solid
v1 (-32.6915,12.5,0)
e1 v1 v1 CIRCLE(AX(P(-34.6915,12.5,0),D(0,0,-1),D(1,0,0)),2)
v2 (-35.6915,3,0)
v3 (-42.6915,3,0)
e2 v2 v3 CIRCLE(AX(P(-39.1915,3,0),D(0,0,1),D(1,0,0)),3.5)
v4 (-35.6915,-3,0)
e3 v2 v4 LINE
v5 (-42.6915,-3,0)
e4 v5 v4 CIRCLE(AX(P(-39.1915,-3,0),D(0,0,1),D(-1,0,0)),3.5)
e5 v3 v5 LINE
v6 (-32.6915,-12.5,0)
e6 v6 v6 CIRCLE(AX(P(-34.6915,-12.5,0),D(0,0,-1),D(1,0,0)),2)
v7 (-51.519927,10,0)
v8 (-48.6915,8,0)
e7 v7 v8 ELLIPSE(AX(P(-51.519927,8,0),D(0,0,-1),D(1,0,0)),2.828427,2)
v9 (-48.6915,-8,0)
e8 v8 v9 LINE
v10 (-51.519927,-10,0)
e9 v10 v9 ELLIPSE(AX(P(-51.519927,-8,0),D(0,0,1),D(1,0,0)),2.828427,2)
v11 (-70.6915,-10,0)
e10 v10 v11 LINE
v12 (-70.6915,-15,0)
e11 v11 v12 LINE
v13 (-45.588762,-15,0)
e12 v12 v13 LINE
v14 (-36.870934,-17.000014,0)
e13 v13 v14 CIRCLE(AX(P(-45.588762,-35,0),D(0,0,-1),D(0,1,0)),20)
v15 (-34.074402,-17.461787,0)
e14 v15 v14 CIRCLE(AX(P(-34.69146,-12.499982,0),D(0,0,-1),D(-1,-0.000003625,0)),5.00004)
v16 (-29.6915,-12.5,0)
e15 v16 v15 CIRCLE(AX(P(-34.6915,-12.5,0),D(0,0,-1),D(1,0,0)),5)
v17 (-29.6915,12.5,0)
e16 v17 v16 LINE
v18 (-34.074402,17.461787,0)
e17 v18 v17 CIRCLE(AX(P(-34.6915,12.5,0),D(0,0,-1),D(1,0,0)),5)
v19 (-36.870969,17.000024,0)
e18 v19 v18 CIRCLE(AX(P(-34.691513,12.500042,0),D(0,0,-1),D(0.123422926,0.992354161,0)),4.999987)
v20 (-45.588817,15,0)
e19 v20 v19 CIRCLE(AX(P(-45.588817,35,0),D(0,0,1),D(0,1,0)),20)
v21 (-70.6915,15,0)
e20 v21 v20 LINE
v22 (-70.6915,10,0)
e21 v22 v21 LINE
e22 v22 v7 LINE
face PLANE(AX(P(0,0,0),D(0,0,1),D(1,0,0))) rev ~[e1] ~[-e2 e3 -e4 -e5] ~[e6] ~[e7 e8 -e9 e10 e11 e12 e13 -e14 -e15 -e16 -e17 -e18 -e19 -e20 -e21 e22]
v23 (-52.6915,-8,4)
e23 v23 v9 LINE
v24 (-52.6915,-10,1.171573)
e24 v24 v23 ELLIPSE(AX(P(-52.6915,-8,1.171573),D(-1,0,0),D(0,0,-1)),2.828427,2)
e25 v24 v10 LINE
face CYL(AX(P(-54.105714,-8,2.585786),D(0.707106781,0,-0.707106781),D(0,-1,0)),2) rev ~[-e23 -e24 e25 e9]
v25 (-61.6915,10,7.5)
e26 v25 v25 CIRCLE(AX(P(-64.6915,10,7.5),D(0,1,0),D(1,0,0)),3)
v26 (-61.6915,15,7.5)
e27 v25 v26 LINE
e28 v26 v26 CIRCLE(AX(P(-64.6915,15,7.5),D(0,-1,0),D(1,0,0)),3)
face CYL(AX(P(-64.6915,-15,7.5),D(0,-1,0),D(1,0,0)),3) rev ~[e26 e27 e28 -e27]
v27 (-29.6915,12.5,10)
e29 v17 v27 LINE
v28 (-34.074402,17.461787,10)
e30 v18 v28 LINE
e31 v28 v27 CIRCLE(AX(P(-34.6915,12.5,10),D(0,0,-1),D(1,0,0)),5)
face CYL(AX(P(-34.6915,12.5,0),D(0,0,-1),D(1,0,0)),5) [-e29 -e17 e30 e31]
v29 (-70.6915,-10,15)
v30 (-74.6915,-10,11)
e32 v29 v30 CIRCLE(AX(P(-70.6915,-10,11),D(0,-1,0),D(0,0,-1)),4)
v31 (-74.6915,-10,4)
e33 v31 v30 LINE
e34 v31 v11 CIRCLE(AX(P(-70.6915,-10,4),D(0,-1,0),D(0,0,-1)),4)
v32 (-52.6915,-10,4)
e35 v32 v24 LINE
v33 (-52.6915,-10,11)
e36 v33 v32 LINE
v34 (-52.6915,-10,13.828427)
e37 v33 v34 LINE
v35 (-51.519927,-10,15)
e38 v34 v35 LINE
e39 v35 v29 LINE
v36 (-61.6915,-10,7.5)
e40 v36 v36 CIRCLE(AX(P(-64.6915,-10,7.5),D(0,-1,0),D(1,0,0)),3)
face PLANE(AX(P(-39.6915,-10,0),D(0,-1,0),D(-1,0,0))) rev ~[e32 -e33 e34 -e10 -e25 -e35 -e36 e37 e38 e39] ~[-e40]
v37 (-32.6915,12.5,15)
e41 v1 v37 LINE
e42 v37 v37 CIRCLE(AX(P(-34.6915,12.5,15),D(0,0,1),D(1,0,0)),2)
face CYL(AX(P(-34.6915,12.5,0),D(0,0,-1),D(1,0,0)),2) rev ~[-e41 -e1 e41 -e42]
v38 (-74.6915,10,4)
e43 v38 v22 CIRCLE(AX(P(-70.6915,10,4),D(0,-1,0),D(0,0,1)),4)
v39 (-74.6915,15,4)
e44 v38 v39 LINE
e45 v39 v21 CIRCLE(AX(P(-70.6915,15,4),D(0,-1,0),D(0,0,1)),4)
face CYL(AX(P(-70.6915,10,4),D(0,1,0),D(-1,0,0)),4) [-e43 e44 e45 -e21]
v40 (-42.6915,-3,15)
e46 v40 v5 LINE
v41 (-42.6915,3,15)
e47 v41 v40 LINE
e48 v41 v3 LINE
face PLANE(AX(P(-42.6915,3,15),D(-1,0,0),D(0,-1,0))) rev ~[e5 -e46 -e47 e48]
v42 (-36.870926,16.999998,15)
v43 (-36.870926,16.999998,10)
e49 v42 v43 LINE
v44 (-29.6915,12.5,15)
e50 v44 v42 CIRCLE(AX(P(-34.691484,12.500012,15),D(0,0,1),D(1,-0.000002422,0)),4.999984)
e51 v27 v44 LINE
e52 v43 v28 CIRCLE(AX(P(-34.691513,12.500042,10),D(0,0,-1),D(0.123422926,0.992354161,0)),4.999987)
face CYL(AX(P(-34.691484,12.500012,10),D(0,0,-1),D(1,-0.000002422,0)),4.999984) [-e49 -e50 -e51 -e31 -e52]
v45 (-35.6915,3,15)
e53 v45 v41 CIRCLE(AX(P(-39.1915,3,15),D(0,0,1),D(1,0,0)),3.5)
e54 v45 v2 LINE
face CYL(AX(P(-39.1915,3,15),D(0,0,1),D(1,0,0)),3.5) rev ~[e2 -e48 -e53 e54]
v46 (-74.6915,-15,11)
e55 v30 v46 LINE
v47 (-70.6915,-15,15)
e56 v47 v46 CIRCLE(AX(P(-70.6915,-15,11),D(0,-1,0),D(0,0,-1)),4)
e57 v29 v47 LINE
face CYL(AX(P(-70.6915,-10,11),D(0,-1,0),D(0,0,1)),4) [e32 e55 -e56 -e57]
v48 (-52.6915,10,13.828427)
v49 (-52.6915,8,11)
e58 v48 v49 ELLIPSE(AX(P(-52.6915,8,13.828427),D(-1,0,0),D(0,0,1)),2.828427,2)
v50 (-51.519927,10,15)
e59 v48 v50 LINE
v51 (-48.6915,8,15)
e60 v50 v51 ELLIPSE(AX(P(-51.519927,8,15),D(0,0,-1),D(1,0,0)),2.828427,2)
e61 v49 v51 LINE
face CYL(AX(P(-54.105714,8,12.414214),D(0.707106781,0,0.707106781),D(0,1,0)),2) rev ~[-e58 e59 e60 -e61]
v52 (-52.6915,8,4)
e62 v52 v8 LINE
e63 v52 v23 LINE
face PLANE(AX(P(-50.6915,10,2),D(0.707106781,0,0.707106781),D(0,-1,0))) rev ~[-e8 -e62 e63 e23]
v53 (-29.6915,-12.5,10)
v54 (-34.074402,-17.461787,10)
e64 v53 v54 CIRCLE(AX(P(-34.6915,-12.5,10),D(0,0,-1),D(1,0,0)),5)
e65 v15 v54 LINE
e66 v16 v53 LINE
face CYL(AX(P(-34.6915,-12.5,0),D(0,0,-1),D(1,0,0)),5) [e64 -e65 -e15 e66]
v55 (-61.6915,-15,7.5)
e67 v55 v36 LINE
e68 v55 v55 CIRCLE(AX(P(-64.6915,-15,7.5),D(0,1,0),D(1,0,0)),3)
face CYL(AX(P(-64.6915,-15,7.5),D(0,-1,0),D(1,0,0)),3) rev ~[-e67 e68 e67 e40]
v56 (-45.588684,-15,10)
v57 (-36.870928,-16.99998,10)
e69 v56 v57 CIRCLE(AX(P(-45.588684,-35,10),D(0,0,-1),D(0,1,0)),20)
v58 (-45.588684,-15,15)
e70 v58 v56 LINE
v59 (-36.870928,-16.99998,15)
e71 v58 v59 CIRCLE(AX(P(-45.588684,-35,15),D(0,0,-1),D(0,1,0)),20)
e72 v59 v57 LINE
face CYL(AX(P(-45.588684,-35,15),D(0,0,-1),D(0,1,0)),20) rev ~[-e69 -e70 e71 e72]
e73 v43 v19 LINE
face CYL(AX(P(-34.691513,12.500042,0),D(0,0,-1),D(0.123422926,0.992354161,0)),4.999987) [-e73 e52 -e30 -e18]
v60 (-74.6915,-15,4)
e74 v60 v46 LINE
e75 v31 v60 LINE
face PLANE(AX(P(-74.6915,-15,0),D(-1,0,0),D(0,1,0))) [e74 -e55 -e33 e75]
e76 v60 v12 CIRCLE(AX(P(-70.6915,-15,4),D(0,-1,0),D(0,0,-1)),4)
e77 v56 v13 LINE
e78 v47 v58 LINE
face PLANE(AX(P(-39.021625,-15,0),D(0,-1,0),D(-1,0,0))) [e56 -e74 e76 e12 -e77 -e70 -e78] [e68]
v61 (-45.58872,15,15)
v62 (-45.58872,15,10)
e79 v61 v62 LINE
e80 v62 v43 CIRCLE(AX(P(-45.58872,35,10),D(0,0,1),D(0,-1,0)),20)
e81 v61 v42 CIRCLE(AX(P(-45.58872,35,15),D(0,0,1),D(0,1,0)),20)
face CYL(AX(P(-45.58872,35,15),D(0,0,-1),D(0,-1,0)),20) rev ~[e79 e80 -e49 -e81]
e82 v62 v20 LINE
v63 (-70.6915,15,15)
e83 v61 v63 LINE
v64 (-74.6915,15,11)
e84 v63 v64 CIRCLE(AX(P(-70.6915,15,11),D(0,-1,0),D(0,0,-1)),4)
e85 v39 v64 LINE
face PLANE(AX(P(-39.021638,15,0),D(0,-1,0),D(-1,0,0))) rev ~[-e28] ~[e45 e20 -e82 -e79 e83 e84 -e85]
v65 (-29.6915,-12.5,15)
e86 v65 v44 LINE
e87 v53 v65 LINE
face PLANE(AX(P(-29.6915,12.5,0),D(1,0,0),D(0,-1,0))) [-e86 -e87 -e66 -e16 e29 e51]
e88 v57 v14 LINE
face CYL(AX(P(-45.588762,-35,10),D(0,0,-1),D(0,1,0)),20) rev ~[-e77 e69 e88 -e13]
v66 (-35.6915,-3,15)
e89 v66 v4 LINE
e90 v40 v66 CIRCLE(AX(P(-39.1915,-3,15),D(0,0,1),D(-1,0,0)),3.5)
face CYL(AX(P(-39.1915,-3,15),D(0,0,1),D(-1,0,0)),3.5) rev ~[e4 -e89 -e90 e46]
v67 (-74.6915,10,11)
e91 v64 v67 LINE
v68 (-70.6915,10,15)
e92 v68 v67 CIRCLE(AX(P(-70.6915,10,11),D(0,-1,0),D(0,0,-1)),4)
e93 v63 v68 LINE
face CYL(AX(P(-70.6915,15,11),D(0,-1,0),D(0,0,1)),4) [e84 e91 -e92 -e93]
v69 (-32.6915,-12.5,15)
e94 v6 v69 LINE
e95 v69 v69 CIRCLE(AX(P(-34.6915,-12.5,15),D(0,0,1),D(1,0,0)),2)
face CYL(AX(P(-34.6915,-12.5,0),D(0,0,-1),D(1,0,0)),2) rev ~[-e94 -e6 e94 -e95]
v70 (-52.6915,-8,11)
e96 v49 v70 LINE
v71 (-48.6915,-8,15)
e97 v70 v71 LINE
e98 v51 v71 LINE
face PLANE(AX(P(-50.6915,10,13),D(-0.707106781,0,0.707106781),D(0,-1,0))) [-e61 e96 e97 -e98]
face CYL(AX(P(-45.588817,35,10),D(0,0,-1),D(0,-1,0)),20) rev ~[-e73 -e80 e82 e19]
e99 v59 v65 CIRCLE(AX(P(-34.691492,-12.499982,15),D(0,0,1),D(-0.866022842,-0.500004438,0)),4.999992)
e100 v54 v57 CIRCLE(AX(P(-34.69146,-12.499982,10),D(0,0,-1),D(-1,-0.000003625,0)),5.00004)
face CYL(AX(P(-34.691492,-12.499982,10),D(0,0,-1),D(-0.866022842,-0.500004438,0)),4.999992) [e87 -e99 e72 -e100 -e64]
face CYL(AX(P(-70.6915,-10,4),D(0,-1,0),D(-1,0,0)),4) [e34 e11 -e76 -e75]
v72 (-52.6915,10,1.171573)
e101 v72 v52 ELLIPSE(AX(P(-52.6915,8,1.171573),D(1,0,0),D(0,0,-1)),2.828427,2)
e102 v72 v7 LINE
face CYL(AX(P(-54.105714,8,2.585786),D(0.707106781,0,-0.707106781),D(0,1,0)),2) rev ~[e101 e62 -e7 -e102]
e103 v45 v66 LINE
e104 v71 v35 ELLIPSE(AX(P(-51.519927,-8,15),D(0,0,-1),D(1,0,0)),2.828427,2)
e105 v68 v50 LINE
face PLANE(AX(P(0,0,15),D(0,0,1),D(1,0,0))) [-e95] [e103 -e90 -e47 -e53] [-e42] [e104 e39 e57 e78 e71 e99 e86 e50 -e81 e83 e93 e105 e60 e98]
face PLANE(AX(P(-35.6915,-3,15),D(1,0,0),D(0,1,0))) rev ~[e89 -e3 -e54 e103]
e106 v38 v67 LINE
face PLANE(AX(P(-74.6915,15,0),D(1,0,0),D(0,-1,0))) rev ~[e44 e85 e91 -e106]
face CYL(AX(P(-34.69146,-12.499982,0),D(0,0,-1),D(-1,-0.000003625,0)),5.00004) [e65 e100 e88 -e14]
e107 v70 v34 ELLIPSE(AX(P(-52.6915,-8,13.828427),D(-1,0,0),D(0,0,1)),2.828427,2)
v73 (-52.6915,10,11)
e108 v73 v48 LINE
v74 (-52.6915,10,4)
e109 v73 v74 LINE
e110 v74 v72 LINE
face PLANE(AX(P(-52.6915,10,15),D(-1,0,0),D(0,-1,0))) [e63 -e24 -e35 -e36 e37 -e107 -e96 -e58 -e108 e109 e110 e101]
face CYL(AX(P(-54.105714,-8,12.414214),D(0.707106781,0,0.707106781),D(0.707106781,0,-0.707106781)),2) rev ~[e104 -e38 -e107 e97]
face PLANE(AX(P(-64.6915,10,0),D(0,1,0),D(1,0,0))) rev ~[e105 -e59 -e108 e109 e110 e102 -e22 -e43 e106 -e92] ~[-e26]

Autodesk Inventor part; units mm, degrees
ref_plane "YZ Plane" through (0, 0, 0) normal (1, 0, 0) x (0, 1, 0)
ref_plane "XZ Plane" through (0, 0, 0) normal (0, 1, 0) x (-1, 0, 0)
ref_plane "XY Plane" through (0, 0, 0) normal (0, 0, 1) x (1, 0, 0)
sketch "Sketch1" plane through (0, 0, 0) normal (0, 0, 1) x (1, 0, 0)
  circle A0 centre (19.8085, -5.5) radius 1 projected
  circle A1 centre (30.8085, -5.5) radius 1 projected
  circle A2 centre (19.8085, 5.5) radius 1 projected
  circle A3 centre (30.8085, 5.5) radius 1 projected
  circle A4 centre (25.3085, 0) radius 6.65 projected
  line L0 (41.3085, 2) -> (41.3085, -2) projected
  line L1 (35.1065, 2) -> (41.3085, 2) projected
  arc A5 (35.1065, 2) -> (26.5426, 9.9236) centre (25.3085, 0) ccw projected
  line L2 (26.5426, 9.9236) -> (-34.0744, 17.4618) projected
  arc A6 (-34.0744, 17.4618) -> (-39.6915, 12.5) centre (-34.6915, 12.5) ccw projected
  line L3 (-39.6915, 12.5) -> (-39.6915, -12.5) projected
  arc A7 (-39.6915, -12.5) -> (-34.0744, -17.4618) centre (-34.6915, -12.5) ccw projected
  line L4 (-34.0744, -17.4618) -> (26.5426, -9.9236) projected
  arc A8 (26.5426, -9.9236) -> (35.1065, -2) centre (25.3085, 0) ccw projected
  line L5 (41.3085, -2) -> (35.1065, -2) projected
  circle A9 centre (-34.6915, 12.5) radius 2 projected
  circle A10 centre (-34.6915, -12.5) radius 2 projected
  line L6 (-25.1979, 6.2809) -> (9.3489, 1.9847) projected
  arc A11 (9.3489, -1.9847) -> (9.3489, 1.9847) centre (9.1021, 0) ccw projected
  line L7 (9.3489, -1.9847) -> (-25.1979, -6.2809) projected
  arc A12 (-29.6915, -2.3115) -> (-25.1979, -6.2809) centre (-25.6915, -2.3115) ccw projected
  line L8 (-29.6915, -2.3115) -> (-29.6915, 2.3115) projected
  arc A13 (-25.1979, 6.2809) -> (-29.6915, 2.3115) centre (-25.6915, 2.3115) ccw projected
  circle A14 centre (-34.6915, -12.5) radius 5
  circle A15 centre (-34.6915, 12.5) radius 5
  line L9 (-34.6915, -12.5) -> (-34.6915, 12.5)
  line L10 (-34.6915, -12.5) -> (-29.6915, -12.5)
  line L11 (-34.6915, 12.5) -> (-29.6915, 12.5)
  line L12 (-29.6915, 12.5) -> (-29.6915, -12.5)
  line L13 (-34.6915, 0) -> (-64.6915, 0)
  line L14 (-64.6915, -10) -> (-64.6915, 10)
  line L15 (-64.6915, 10) -> (-34.6915, 10)
  line L16 (-34.6915, 10) -> (-34.6915, -10)
  line L17 (-34.6915, -10) -> (-64.6915, -10)
  line L18 (-64.6915, -10) -> (-34.6915, 10) construction
  line L19 (-64.6915, 10) -> (-34.6915, -10) construction
  line L20 (-64.6915, -10) -> (-34.6915, -10)
  line L21 (-34.6915, -10) -> (-34.6915, -15)
  line L22 (-34.6915, -15) -> (-64.6915, -15)
  line L23 (-64.6915, -15) -> (-64.6915, -10)
  line L24 (-64.6915, 10) -> (-34.6915, 10)
  line L25 (-34.6915, 10) -> (-34.6915, 15)
  line L26 (-34.6915, 15) -> (-64.6915, 15)
  line L27 (-64.6915, 15) -> (-64.6915, 10)
  point P0 (0, 0)
  point P1 (-49.6915, 0)
  point P2 (-39.0216, 15)
  point P3 (-39.6915, 10)
  point P4 (-39.6915, -10)
  point P5 (-39.0216, -15)
  dimension "d0" = 10
  dimension "d1" = 10
  dimension "d2" = 30
  dimension "d3" = 20
  dimension "d4" = 30
  dimension "d5" = 30
  dimension "d6" = 5
  dimension "d7" = 30
  dimension "d8" = 5
extrude "Extrusion1" add sketch "Sketch1" along normal blind 10 contours A15 L11 A9 L25 L26 A6 | A7 L22 L21 A10 L10 A14 | L26 L25 A9 L9 L15 A15 A6 | A6 L3 L15 L27 L26 | L12 L8 A14 L9 A15 | A15 L9 A9 L11 | L22 L23 L17 L3 A7 | A7 A14 L17 L9 A10 L21 L22 | L10 A10 L9 A14 | A15 L15 L3 | L9 L13 L3 L15 A15 | A15 L15 L9 | L3 L17 A14 | L9 L17 A14 | A14 L17 L3 L13 L9
thicken "Thicken1" operation add thickness 10 both sides no extend neighbours yes toward (-1, 0, 0) faces at (-64.6915, -11.6667, 3.3333)
thicken "Thicken2" operation add thickness 10 both sides no extend neighbours yes toward (-1, 0, 0) faces at (-64.6915, 13.3333, 3.3333)
sketch "Sketch2" plane through (0, 0, 10) normal (0, 0, 1) x (1, 0, 0)
  line L0 (-39.6915, 10) -> (-39.6915, -10) projected
  line L1 (-39.6915, -10) -> (-74.6915, -10) projected
  line L2 (-74.6915, -10) -> (-74.6915, -15) projected
  line L3 (-74.6915, -15) -> (-39.0216, -15) projected
  arc A0 (-39.0216, -15) -> (-29.6915, -12.5) centre (-34.6915, -12.5) ccw projected
  line L4 (-29.6915, -12.5) -> (-29.6915, 12.5) projected
  arc A1 (-29.6915, 12.5) -> (-39.0216, 15) centre (-34.6915, 12.5) ccw projected
  line L5 (-39.0216, 15) -> (-74.6915, 15) projected
  line L6 (-74.6915, 15) -> (-74.6915, 10) projected
  line L7 (-74.6915, 10) -> (-39.6915, 10) projected
  circle A2 centre (-34.6915, -12.5) radius 2 projected
  circle A3 centre (-34.6915, 12.5) radius 2 projected
  point P0 (0, 0)
extrude "Extrusion2" add sketch "Sketch2" along normal blind 5
sketch "Sketch3" plane through (0, 0, 15) normal (0, 0, 1) x (1, 0, 0)
  line L0 (-39.6915, 10) -> (-39.6915, -10) projected
  line L1 (-39.6915, -10) -> (-74.6915, -10) projected
  line L2 (-74.6915, -10) -> (-74.6915, -15) projected
  line L3 (-74.6915, -15) -> (-39.0216, -15) projected
  arc A0 (-39.0216, -15) -> (-29.6915, -12.5) centre (-34.6915, -12.5) ccw projected
  line L4 (-29.6915, -12.5) -> (-29.6915, 12.5) projected
  arc A1 (-29.6915, 12.5) -> (-39.0216, 15) centre (-34.6915, 12.5) ccw projected
  line L5 (-39.0216, 15) -> (-74.6915, 15) projected
  line L6 (-74.6915, 15) -> (-74.6915, 10) projected
  line L7 (-74.6915, 10) -> (-39.6915, 10) projected
  circle A2 centre (-34.6915, -12.5) radius 2 projected
  circle A3 centre (-34.6915, 12.5) radius 2 projected
  line L8 (-39.6915, 10) -> (-39.6915, -10) projected
  line L9 (-39.6915, 10) -> (-52.6915, 10)
  line L10 (-52.6915, 10) -> (-52.6915, -10)
  line L11 (-52.6915, -10) -> (-39.6915, -10)
  line L12 (-39.6915, -10) -> (-39.6915, 10)
  point P0 (0, 0)
  dimension "d17" = 13
  dimension "d18" = 20
extrude "Extrusion3" add sketch "Sketch3" against normal up to surface (15 mm away) contours L0 L1 L10 L7
chamfer "Chamfer1" distance 4 angle 45 2 edges at (-52.6915, 0, 0) (-52.6915, 0, 15)
fillet "Fillet1" radius 20 2 edges at (-39.0216, -15, 7.5) (-39.0216, 15, 7.5)
sketch "Sketch4" plane through (0, 0, 15) normal (0, 0, 1) x (1, 0, 0)
  line L0 (-48.6915, -10) -> (-74.6915, -10) projected
  line L1 (-74.6915, -10) -> (-74.6915, -15) projected
  line L2 (-74.6915, -15) -> (-45.5887, -15) projected
  arc A0 (-36.8709, -17) -> (-45.5887, -15) centre (-45.5887, -35) ccw projected
  arc A1 (-36.8709, -17) -> (-29.6915, -12.5) centre (-34.6915, -12.5) ccw projected
  line L3 (-29.6915, -12.5) -> (-29.6915, 12.5) projected
  arc A2 (-29.6915, 12.5) -> (-36.8709, 17) centre (-34.6915, 12.5) ccw projected
  arc A3 (-45.5887, 15) -> (-36.8709, 17) centre (-45.5887, 35) ccw projected
  line L4 (-45.5887, 15) -> (-74.6915, 15) projected
  line L5 (-74.6915, 15) -> (-74.6915, 10) projected
  line L6 (-74.6915, 10) -> (-48.6915, 10) projected
  line L7 (-48.6915, -10) -> (-48.6915, 10) projected
  circle A4 centre (-34.6915, -12.5) radius 2 projected
  circle A5 centre (-34.6915, 12.5) radius 2 projected
  circle A6 centre (-34.6915, -12.5) radius 2 projected
  line L8 (-34.6915, 12.5) -> (-34.6915, -12.5)
  line L9 (-34.6915, 0) -> (-39.1915, 0)
  line L10 (-39.1915, 3) -> (-39.1915, -3) construction
  line L11 (-42.6915, 3) -> (-42.6915, -3)
  line L12 (-35.6915, -3) -> (-35.6915, 3)
  arc A7 (-35.6915, 3) -> (-42.6915, 3) centre (-39.1915, 3) ccw
  arc A8 (-42.6915, -3) -> (-35.6915, -3) centre (-39.1915, -3) ccw
  point P0 (0, 0)
  dimension "d25" = 4.5
  dimension "d26" = 3
  dimension "d27" = 7
extrude "Extrusion4" cut sketch "Sketch4" against normal blind 20 contours A7 L12 A8 L11
sketch "Sketch5" plane through (-74.6915, -15, 0) normal (0, -1, 0) x (1, 0, 0)
  line L0 (29.1028, 15) -> (29.1028, 0) projected
  line L1 (0, 15) -> (29.1028, 15) projected
  line L2 (0, 0) -> (0, 15) projected
  line L3 (0, 0) -> (29.1028, 0) projected
  line L4 (0, 0) -> (0, 15) projected
  line L5 (0, 7.5) -> (10, 7.5)
  circle A0 centre (10, 7.5) radius 3
  point P0 (74.6915, 0)
  dimension "d30" = 10
  dimension "d31" = 6
extrude "Extrusion5" cut sketch "Sketch5" against normal blind 30 contours A0
fillet "Fillet2" radius 2 4 edges at (-50.6915, 10, 13) (-50.6915, -10, 13) (-50.6915, -10, 2) (-50.6915, 10, 2)
fillet "Fillet3" radius 4 4 edges at (-74.6915, -12.5, 0) (-74.6915, -12.5, 15) (-74.6915, 12.5, 0) (-74.6915, 12.5, 15)
properties part number "2020_fixer_1"
